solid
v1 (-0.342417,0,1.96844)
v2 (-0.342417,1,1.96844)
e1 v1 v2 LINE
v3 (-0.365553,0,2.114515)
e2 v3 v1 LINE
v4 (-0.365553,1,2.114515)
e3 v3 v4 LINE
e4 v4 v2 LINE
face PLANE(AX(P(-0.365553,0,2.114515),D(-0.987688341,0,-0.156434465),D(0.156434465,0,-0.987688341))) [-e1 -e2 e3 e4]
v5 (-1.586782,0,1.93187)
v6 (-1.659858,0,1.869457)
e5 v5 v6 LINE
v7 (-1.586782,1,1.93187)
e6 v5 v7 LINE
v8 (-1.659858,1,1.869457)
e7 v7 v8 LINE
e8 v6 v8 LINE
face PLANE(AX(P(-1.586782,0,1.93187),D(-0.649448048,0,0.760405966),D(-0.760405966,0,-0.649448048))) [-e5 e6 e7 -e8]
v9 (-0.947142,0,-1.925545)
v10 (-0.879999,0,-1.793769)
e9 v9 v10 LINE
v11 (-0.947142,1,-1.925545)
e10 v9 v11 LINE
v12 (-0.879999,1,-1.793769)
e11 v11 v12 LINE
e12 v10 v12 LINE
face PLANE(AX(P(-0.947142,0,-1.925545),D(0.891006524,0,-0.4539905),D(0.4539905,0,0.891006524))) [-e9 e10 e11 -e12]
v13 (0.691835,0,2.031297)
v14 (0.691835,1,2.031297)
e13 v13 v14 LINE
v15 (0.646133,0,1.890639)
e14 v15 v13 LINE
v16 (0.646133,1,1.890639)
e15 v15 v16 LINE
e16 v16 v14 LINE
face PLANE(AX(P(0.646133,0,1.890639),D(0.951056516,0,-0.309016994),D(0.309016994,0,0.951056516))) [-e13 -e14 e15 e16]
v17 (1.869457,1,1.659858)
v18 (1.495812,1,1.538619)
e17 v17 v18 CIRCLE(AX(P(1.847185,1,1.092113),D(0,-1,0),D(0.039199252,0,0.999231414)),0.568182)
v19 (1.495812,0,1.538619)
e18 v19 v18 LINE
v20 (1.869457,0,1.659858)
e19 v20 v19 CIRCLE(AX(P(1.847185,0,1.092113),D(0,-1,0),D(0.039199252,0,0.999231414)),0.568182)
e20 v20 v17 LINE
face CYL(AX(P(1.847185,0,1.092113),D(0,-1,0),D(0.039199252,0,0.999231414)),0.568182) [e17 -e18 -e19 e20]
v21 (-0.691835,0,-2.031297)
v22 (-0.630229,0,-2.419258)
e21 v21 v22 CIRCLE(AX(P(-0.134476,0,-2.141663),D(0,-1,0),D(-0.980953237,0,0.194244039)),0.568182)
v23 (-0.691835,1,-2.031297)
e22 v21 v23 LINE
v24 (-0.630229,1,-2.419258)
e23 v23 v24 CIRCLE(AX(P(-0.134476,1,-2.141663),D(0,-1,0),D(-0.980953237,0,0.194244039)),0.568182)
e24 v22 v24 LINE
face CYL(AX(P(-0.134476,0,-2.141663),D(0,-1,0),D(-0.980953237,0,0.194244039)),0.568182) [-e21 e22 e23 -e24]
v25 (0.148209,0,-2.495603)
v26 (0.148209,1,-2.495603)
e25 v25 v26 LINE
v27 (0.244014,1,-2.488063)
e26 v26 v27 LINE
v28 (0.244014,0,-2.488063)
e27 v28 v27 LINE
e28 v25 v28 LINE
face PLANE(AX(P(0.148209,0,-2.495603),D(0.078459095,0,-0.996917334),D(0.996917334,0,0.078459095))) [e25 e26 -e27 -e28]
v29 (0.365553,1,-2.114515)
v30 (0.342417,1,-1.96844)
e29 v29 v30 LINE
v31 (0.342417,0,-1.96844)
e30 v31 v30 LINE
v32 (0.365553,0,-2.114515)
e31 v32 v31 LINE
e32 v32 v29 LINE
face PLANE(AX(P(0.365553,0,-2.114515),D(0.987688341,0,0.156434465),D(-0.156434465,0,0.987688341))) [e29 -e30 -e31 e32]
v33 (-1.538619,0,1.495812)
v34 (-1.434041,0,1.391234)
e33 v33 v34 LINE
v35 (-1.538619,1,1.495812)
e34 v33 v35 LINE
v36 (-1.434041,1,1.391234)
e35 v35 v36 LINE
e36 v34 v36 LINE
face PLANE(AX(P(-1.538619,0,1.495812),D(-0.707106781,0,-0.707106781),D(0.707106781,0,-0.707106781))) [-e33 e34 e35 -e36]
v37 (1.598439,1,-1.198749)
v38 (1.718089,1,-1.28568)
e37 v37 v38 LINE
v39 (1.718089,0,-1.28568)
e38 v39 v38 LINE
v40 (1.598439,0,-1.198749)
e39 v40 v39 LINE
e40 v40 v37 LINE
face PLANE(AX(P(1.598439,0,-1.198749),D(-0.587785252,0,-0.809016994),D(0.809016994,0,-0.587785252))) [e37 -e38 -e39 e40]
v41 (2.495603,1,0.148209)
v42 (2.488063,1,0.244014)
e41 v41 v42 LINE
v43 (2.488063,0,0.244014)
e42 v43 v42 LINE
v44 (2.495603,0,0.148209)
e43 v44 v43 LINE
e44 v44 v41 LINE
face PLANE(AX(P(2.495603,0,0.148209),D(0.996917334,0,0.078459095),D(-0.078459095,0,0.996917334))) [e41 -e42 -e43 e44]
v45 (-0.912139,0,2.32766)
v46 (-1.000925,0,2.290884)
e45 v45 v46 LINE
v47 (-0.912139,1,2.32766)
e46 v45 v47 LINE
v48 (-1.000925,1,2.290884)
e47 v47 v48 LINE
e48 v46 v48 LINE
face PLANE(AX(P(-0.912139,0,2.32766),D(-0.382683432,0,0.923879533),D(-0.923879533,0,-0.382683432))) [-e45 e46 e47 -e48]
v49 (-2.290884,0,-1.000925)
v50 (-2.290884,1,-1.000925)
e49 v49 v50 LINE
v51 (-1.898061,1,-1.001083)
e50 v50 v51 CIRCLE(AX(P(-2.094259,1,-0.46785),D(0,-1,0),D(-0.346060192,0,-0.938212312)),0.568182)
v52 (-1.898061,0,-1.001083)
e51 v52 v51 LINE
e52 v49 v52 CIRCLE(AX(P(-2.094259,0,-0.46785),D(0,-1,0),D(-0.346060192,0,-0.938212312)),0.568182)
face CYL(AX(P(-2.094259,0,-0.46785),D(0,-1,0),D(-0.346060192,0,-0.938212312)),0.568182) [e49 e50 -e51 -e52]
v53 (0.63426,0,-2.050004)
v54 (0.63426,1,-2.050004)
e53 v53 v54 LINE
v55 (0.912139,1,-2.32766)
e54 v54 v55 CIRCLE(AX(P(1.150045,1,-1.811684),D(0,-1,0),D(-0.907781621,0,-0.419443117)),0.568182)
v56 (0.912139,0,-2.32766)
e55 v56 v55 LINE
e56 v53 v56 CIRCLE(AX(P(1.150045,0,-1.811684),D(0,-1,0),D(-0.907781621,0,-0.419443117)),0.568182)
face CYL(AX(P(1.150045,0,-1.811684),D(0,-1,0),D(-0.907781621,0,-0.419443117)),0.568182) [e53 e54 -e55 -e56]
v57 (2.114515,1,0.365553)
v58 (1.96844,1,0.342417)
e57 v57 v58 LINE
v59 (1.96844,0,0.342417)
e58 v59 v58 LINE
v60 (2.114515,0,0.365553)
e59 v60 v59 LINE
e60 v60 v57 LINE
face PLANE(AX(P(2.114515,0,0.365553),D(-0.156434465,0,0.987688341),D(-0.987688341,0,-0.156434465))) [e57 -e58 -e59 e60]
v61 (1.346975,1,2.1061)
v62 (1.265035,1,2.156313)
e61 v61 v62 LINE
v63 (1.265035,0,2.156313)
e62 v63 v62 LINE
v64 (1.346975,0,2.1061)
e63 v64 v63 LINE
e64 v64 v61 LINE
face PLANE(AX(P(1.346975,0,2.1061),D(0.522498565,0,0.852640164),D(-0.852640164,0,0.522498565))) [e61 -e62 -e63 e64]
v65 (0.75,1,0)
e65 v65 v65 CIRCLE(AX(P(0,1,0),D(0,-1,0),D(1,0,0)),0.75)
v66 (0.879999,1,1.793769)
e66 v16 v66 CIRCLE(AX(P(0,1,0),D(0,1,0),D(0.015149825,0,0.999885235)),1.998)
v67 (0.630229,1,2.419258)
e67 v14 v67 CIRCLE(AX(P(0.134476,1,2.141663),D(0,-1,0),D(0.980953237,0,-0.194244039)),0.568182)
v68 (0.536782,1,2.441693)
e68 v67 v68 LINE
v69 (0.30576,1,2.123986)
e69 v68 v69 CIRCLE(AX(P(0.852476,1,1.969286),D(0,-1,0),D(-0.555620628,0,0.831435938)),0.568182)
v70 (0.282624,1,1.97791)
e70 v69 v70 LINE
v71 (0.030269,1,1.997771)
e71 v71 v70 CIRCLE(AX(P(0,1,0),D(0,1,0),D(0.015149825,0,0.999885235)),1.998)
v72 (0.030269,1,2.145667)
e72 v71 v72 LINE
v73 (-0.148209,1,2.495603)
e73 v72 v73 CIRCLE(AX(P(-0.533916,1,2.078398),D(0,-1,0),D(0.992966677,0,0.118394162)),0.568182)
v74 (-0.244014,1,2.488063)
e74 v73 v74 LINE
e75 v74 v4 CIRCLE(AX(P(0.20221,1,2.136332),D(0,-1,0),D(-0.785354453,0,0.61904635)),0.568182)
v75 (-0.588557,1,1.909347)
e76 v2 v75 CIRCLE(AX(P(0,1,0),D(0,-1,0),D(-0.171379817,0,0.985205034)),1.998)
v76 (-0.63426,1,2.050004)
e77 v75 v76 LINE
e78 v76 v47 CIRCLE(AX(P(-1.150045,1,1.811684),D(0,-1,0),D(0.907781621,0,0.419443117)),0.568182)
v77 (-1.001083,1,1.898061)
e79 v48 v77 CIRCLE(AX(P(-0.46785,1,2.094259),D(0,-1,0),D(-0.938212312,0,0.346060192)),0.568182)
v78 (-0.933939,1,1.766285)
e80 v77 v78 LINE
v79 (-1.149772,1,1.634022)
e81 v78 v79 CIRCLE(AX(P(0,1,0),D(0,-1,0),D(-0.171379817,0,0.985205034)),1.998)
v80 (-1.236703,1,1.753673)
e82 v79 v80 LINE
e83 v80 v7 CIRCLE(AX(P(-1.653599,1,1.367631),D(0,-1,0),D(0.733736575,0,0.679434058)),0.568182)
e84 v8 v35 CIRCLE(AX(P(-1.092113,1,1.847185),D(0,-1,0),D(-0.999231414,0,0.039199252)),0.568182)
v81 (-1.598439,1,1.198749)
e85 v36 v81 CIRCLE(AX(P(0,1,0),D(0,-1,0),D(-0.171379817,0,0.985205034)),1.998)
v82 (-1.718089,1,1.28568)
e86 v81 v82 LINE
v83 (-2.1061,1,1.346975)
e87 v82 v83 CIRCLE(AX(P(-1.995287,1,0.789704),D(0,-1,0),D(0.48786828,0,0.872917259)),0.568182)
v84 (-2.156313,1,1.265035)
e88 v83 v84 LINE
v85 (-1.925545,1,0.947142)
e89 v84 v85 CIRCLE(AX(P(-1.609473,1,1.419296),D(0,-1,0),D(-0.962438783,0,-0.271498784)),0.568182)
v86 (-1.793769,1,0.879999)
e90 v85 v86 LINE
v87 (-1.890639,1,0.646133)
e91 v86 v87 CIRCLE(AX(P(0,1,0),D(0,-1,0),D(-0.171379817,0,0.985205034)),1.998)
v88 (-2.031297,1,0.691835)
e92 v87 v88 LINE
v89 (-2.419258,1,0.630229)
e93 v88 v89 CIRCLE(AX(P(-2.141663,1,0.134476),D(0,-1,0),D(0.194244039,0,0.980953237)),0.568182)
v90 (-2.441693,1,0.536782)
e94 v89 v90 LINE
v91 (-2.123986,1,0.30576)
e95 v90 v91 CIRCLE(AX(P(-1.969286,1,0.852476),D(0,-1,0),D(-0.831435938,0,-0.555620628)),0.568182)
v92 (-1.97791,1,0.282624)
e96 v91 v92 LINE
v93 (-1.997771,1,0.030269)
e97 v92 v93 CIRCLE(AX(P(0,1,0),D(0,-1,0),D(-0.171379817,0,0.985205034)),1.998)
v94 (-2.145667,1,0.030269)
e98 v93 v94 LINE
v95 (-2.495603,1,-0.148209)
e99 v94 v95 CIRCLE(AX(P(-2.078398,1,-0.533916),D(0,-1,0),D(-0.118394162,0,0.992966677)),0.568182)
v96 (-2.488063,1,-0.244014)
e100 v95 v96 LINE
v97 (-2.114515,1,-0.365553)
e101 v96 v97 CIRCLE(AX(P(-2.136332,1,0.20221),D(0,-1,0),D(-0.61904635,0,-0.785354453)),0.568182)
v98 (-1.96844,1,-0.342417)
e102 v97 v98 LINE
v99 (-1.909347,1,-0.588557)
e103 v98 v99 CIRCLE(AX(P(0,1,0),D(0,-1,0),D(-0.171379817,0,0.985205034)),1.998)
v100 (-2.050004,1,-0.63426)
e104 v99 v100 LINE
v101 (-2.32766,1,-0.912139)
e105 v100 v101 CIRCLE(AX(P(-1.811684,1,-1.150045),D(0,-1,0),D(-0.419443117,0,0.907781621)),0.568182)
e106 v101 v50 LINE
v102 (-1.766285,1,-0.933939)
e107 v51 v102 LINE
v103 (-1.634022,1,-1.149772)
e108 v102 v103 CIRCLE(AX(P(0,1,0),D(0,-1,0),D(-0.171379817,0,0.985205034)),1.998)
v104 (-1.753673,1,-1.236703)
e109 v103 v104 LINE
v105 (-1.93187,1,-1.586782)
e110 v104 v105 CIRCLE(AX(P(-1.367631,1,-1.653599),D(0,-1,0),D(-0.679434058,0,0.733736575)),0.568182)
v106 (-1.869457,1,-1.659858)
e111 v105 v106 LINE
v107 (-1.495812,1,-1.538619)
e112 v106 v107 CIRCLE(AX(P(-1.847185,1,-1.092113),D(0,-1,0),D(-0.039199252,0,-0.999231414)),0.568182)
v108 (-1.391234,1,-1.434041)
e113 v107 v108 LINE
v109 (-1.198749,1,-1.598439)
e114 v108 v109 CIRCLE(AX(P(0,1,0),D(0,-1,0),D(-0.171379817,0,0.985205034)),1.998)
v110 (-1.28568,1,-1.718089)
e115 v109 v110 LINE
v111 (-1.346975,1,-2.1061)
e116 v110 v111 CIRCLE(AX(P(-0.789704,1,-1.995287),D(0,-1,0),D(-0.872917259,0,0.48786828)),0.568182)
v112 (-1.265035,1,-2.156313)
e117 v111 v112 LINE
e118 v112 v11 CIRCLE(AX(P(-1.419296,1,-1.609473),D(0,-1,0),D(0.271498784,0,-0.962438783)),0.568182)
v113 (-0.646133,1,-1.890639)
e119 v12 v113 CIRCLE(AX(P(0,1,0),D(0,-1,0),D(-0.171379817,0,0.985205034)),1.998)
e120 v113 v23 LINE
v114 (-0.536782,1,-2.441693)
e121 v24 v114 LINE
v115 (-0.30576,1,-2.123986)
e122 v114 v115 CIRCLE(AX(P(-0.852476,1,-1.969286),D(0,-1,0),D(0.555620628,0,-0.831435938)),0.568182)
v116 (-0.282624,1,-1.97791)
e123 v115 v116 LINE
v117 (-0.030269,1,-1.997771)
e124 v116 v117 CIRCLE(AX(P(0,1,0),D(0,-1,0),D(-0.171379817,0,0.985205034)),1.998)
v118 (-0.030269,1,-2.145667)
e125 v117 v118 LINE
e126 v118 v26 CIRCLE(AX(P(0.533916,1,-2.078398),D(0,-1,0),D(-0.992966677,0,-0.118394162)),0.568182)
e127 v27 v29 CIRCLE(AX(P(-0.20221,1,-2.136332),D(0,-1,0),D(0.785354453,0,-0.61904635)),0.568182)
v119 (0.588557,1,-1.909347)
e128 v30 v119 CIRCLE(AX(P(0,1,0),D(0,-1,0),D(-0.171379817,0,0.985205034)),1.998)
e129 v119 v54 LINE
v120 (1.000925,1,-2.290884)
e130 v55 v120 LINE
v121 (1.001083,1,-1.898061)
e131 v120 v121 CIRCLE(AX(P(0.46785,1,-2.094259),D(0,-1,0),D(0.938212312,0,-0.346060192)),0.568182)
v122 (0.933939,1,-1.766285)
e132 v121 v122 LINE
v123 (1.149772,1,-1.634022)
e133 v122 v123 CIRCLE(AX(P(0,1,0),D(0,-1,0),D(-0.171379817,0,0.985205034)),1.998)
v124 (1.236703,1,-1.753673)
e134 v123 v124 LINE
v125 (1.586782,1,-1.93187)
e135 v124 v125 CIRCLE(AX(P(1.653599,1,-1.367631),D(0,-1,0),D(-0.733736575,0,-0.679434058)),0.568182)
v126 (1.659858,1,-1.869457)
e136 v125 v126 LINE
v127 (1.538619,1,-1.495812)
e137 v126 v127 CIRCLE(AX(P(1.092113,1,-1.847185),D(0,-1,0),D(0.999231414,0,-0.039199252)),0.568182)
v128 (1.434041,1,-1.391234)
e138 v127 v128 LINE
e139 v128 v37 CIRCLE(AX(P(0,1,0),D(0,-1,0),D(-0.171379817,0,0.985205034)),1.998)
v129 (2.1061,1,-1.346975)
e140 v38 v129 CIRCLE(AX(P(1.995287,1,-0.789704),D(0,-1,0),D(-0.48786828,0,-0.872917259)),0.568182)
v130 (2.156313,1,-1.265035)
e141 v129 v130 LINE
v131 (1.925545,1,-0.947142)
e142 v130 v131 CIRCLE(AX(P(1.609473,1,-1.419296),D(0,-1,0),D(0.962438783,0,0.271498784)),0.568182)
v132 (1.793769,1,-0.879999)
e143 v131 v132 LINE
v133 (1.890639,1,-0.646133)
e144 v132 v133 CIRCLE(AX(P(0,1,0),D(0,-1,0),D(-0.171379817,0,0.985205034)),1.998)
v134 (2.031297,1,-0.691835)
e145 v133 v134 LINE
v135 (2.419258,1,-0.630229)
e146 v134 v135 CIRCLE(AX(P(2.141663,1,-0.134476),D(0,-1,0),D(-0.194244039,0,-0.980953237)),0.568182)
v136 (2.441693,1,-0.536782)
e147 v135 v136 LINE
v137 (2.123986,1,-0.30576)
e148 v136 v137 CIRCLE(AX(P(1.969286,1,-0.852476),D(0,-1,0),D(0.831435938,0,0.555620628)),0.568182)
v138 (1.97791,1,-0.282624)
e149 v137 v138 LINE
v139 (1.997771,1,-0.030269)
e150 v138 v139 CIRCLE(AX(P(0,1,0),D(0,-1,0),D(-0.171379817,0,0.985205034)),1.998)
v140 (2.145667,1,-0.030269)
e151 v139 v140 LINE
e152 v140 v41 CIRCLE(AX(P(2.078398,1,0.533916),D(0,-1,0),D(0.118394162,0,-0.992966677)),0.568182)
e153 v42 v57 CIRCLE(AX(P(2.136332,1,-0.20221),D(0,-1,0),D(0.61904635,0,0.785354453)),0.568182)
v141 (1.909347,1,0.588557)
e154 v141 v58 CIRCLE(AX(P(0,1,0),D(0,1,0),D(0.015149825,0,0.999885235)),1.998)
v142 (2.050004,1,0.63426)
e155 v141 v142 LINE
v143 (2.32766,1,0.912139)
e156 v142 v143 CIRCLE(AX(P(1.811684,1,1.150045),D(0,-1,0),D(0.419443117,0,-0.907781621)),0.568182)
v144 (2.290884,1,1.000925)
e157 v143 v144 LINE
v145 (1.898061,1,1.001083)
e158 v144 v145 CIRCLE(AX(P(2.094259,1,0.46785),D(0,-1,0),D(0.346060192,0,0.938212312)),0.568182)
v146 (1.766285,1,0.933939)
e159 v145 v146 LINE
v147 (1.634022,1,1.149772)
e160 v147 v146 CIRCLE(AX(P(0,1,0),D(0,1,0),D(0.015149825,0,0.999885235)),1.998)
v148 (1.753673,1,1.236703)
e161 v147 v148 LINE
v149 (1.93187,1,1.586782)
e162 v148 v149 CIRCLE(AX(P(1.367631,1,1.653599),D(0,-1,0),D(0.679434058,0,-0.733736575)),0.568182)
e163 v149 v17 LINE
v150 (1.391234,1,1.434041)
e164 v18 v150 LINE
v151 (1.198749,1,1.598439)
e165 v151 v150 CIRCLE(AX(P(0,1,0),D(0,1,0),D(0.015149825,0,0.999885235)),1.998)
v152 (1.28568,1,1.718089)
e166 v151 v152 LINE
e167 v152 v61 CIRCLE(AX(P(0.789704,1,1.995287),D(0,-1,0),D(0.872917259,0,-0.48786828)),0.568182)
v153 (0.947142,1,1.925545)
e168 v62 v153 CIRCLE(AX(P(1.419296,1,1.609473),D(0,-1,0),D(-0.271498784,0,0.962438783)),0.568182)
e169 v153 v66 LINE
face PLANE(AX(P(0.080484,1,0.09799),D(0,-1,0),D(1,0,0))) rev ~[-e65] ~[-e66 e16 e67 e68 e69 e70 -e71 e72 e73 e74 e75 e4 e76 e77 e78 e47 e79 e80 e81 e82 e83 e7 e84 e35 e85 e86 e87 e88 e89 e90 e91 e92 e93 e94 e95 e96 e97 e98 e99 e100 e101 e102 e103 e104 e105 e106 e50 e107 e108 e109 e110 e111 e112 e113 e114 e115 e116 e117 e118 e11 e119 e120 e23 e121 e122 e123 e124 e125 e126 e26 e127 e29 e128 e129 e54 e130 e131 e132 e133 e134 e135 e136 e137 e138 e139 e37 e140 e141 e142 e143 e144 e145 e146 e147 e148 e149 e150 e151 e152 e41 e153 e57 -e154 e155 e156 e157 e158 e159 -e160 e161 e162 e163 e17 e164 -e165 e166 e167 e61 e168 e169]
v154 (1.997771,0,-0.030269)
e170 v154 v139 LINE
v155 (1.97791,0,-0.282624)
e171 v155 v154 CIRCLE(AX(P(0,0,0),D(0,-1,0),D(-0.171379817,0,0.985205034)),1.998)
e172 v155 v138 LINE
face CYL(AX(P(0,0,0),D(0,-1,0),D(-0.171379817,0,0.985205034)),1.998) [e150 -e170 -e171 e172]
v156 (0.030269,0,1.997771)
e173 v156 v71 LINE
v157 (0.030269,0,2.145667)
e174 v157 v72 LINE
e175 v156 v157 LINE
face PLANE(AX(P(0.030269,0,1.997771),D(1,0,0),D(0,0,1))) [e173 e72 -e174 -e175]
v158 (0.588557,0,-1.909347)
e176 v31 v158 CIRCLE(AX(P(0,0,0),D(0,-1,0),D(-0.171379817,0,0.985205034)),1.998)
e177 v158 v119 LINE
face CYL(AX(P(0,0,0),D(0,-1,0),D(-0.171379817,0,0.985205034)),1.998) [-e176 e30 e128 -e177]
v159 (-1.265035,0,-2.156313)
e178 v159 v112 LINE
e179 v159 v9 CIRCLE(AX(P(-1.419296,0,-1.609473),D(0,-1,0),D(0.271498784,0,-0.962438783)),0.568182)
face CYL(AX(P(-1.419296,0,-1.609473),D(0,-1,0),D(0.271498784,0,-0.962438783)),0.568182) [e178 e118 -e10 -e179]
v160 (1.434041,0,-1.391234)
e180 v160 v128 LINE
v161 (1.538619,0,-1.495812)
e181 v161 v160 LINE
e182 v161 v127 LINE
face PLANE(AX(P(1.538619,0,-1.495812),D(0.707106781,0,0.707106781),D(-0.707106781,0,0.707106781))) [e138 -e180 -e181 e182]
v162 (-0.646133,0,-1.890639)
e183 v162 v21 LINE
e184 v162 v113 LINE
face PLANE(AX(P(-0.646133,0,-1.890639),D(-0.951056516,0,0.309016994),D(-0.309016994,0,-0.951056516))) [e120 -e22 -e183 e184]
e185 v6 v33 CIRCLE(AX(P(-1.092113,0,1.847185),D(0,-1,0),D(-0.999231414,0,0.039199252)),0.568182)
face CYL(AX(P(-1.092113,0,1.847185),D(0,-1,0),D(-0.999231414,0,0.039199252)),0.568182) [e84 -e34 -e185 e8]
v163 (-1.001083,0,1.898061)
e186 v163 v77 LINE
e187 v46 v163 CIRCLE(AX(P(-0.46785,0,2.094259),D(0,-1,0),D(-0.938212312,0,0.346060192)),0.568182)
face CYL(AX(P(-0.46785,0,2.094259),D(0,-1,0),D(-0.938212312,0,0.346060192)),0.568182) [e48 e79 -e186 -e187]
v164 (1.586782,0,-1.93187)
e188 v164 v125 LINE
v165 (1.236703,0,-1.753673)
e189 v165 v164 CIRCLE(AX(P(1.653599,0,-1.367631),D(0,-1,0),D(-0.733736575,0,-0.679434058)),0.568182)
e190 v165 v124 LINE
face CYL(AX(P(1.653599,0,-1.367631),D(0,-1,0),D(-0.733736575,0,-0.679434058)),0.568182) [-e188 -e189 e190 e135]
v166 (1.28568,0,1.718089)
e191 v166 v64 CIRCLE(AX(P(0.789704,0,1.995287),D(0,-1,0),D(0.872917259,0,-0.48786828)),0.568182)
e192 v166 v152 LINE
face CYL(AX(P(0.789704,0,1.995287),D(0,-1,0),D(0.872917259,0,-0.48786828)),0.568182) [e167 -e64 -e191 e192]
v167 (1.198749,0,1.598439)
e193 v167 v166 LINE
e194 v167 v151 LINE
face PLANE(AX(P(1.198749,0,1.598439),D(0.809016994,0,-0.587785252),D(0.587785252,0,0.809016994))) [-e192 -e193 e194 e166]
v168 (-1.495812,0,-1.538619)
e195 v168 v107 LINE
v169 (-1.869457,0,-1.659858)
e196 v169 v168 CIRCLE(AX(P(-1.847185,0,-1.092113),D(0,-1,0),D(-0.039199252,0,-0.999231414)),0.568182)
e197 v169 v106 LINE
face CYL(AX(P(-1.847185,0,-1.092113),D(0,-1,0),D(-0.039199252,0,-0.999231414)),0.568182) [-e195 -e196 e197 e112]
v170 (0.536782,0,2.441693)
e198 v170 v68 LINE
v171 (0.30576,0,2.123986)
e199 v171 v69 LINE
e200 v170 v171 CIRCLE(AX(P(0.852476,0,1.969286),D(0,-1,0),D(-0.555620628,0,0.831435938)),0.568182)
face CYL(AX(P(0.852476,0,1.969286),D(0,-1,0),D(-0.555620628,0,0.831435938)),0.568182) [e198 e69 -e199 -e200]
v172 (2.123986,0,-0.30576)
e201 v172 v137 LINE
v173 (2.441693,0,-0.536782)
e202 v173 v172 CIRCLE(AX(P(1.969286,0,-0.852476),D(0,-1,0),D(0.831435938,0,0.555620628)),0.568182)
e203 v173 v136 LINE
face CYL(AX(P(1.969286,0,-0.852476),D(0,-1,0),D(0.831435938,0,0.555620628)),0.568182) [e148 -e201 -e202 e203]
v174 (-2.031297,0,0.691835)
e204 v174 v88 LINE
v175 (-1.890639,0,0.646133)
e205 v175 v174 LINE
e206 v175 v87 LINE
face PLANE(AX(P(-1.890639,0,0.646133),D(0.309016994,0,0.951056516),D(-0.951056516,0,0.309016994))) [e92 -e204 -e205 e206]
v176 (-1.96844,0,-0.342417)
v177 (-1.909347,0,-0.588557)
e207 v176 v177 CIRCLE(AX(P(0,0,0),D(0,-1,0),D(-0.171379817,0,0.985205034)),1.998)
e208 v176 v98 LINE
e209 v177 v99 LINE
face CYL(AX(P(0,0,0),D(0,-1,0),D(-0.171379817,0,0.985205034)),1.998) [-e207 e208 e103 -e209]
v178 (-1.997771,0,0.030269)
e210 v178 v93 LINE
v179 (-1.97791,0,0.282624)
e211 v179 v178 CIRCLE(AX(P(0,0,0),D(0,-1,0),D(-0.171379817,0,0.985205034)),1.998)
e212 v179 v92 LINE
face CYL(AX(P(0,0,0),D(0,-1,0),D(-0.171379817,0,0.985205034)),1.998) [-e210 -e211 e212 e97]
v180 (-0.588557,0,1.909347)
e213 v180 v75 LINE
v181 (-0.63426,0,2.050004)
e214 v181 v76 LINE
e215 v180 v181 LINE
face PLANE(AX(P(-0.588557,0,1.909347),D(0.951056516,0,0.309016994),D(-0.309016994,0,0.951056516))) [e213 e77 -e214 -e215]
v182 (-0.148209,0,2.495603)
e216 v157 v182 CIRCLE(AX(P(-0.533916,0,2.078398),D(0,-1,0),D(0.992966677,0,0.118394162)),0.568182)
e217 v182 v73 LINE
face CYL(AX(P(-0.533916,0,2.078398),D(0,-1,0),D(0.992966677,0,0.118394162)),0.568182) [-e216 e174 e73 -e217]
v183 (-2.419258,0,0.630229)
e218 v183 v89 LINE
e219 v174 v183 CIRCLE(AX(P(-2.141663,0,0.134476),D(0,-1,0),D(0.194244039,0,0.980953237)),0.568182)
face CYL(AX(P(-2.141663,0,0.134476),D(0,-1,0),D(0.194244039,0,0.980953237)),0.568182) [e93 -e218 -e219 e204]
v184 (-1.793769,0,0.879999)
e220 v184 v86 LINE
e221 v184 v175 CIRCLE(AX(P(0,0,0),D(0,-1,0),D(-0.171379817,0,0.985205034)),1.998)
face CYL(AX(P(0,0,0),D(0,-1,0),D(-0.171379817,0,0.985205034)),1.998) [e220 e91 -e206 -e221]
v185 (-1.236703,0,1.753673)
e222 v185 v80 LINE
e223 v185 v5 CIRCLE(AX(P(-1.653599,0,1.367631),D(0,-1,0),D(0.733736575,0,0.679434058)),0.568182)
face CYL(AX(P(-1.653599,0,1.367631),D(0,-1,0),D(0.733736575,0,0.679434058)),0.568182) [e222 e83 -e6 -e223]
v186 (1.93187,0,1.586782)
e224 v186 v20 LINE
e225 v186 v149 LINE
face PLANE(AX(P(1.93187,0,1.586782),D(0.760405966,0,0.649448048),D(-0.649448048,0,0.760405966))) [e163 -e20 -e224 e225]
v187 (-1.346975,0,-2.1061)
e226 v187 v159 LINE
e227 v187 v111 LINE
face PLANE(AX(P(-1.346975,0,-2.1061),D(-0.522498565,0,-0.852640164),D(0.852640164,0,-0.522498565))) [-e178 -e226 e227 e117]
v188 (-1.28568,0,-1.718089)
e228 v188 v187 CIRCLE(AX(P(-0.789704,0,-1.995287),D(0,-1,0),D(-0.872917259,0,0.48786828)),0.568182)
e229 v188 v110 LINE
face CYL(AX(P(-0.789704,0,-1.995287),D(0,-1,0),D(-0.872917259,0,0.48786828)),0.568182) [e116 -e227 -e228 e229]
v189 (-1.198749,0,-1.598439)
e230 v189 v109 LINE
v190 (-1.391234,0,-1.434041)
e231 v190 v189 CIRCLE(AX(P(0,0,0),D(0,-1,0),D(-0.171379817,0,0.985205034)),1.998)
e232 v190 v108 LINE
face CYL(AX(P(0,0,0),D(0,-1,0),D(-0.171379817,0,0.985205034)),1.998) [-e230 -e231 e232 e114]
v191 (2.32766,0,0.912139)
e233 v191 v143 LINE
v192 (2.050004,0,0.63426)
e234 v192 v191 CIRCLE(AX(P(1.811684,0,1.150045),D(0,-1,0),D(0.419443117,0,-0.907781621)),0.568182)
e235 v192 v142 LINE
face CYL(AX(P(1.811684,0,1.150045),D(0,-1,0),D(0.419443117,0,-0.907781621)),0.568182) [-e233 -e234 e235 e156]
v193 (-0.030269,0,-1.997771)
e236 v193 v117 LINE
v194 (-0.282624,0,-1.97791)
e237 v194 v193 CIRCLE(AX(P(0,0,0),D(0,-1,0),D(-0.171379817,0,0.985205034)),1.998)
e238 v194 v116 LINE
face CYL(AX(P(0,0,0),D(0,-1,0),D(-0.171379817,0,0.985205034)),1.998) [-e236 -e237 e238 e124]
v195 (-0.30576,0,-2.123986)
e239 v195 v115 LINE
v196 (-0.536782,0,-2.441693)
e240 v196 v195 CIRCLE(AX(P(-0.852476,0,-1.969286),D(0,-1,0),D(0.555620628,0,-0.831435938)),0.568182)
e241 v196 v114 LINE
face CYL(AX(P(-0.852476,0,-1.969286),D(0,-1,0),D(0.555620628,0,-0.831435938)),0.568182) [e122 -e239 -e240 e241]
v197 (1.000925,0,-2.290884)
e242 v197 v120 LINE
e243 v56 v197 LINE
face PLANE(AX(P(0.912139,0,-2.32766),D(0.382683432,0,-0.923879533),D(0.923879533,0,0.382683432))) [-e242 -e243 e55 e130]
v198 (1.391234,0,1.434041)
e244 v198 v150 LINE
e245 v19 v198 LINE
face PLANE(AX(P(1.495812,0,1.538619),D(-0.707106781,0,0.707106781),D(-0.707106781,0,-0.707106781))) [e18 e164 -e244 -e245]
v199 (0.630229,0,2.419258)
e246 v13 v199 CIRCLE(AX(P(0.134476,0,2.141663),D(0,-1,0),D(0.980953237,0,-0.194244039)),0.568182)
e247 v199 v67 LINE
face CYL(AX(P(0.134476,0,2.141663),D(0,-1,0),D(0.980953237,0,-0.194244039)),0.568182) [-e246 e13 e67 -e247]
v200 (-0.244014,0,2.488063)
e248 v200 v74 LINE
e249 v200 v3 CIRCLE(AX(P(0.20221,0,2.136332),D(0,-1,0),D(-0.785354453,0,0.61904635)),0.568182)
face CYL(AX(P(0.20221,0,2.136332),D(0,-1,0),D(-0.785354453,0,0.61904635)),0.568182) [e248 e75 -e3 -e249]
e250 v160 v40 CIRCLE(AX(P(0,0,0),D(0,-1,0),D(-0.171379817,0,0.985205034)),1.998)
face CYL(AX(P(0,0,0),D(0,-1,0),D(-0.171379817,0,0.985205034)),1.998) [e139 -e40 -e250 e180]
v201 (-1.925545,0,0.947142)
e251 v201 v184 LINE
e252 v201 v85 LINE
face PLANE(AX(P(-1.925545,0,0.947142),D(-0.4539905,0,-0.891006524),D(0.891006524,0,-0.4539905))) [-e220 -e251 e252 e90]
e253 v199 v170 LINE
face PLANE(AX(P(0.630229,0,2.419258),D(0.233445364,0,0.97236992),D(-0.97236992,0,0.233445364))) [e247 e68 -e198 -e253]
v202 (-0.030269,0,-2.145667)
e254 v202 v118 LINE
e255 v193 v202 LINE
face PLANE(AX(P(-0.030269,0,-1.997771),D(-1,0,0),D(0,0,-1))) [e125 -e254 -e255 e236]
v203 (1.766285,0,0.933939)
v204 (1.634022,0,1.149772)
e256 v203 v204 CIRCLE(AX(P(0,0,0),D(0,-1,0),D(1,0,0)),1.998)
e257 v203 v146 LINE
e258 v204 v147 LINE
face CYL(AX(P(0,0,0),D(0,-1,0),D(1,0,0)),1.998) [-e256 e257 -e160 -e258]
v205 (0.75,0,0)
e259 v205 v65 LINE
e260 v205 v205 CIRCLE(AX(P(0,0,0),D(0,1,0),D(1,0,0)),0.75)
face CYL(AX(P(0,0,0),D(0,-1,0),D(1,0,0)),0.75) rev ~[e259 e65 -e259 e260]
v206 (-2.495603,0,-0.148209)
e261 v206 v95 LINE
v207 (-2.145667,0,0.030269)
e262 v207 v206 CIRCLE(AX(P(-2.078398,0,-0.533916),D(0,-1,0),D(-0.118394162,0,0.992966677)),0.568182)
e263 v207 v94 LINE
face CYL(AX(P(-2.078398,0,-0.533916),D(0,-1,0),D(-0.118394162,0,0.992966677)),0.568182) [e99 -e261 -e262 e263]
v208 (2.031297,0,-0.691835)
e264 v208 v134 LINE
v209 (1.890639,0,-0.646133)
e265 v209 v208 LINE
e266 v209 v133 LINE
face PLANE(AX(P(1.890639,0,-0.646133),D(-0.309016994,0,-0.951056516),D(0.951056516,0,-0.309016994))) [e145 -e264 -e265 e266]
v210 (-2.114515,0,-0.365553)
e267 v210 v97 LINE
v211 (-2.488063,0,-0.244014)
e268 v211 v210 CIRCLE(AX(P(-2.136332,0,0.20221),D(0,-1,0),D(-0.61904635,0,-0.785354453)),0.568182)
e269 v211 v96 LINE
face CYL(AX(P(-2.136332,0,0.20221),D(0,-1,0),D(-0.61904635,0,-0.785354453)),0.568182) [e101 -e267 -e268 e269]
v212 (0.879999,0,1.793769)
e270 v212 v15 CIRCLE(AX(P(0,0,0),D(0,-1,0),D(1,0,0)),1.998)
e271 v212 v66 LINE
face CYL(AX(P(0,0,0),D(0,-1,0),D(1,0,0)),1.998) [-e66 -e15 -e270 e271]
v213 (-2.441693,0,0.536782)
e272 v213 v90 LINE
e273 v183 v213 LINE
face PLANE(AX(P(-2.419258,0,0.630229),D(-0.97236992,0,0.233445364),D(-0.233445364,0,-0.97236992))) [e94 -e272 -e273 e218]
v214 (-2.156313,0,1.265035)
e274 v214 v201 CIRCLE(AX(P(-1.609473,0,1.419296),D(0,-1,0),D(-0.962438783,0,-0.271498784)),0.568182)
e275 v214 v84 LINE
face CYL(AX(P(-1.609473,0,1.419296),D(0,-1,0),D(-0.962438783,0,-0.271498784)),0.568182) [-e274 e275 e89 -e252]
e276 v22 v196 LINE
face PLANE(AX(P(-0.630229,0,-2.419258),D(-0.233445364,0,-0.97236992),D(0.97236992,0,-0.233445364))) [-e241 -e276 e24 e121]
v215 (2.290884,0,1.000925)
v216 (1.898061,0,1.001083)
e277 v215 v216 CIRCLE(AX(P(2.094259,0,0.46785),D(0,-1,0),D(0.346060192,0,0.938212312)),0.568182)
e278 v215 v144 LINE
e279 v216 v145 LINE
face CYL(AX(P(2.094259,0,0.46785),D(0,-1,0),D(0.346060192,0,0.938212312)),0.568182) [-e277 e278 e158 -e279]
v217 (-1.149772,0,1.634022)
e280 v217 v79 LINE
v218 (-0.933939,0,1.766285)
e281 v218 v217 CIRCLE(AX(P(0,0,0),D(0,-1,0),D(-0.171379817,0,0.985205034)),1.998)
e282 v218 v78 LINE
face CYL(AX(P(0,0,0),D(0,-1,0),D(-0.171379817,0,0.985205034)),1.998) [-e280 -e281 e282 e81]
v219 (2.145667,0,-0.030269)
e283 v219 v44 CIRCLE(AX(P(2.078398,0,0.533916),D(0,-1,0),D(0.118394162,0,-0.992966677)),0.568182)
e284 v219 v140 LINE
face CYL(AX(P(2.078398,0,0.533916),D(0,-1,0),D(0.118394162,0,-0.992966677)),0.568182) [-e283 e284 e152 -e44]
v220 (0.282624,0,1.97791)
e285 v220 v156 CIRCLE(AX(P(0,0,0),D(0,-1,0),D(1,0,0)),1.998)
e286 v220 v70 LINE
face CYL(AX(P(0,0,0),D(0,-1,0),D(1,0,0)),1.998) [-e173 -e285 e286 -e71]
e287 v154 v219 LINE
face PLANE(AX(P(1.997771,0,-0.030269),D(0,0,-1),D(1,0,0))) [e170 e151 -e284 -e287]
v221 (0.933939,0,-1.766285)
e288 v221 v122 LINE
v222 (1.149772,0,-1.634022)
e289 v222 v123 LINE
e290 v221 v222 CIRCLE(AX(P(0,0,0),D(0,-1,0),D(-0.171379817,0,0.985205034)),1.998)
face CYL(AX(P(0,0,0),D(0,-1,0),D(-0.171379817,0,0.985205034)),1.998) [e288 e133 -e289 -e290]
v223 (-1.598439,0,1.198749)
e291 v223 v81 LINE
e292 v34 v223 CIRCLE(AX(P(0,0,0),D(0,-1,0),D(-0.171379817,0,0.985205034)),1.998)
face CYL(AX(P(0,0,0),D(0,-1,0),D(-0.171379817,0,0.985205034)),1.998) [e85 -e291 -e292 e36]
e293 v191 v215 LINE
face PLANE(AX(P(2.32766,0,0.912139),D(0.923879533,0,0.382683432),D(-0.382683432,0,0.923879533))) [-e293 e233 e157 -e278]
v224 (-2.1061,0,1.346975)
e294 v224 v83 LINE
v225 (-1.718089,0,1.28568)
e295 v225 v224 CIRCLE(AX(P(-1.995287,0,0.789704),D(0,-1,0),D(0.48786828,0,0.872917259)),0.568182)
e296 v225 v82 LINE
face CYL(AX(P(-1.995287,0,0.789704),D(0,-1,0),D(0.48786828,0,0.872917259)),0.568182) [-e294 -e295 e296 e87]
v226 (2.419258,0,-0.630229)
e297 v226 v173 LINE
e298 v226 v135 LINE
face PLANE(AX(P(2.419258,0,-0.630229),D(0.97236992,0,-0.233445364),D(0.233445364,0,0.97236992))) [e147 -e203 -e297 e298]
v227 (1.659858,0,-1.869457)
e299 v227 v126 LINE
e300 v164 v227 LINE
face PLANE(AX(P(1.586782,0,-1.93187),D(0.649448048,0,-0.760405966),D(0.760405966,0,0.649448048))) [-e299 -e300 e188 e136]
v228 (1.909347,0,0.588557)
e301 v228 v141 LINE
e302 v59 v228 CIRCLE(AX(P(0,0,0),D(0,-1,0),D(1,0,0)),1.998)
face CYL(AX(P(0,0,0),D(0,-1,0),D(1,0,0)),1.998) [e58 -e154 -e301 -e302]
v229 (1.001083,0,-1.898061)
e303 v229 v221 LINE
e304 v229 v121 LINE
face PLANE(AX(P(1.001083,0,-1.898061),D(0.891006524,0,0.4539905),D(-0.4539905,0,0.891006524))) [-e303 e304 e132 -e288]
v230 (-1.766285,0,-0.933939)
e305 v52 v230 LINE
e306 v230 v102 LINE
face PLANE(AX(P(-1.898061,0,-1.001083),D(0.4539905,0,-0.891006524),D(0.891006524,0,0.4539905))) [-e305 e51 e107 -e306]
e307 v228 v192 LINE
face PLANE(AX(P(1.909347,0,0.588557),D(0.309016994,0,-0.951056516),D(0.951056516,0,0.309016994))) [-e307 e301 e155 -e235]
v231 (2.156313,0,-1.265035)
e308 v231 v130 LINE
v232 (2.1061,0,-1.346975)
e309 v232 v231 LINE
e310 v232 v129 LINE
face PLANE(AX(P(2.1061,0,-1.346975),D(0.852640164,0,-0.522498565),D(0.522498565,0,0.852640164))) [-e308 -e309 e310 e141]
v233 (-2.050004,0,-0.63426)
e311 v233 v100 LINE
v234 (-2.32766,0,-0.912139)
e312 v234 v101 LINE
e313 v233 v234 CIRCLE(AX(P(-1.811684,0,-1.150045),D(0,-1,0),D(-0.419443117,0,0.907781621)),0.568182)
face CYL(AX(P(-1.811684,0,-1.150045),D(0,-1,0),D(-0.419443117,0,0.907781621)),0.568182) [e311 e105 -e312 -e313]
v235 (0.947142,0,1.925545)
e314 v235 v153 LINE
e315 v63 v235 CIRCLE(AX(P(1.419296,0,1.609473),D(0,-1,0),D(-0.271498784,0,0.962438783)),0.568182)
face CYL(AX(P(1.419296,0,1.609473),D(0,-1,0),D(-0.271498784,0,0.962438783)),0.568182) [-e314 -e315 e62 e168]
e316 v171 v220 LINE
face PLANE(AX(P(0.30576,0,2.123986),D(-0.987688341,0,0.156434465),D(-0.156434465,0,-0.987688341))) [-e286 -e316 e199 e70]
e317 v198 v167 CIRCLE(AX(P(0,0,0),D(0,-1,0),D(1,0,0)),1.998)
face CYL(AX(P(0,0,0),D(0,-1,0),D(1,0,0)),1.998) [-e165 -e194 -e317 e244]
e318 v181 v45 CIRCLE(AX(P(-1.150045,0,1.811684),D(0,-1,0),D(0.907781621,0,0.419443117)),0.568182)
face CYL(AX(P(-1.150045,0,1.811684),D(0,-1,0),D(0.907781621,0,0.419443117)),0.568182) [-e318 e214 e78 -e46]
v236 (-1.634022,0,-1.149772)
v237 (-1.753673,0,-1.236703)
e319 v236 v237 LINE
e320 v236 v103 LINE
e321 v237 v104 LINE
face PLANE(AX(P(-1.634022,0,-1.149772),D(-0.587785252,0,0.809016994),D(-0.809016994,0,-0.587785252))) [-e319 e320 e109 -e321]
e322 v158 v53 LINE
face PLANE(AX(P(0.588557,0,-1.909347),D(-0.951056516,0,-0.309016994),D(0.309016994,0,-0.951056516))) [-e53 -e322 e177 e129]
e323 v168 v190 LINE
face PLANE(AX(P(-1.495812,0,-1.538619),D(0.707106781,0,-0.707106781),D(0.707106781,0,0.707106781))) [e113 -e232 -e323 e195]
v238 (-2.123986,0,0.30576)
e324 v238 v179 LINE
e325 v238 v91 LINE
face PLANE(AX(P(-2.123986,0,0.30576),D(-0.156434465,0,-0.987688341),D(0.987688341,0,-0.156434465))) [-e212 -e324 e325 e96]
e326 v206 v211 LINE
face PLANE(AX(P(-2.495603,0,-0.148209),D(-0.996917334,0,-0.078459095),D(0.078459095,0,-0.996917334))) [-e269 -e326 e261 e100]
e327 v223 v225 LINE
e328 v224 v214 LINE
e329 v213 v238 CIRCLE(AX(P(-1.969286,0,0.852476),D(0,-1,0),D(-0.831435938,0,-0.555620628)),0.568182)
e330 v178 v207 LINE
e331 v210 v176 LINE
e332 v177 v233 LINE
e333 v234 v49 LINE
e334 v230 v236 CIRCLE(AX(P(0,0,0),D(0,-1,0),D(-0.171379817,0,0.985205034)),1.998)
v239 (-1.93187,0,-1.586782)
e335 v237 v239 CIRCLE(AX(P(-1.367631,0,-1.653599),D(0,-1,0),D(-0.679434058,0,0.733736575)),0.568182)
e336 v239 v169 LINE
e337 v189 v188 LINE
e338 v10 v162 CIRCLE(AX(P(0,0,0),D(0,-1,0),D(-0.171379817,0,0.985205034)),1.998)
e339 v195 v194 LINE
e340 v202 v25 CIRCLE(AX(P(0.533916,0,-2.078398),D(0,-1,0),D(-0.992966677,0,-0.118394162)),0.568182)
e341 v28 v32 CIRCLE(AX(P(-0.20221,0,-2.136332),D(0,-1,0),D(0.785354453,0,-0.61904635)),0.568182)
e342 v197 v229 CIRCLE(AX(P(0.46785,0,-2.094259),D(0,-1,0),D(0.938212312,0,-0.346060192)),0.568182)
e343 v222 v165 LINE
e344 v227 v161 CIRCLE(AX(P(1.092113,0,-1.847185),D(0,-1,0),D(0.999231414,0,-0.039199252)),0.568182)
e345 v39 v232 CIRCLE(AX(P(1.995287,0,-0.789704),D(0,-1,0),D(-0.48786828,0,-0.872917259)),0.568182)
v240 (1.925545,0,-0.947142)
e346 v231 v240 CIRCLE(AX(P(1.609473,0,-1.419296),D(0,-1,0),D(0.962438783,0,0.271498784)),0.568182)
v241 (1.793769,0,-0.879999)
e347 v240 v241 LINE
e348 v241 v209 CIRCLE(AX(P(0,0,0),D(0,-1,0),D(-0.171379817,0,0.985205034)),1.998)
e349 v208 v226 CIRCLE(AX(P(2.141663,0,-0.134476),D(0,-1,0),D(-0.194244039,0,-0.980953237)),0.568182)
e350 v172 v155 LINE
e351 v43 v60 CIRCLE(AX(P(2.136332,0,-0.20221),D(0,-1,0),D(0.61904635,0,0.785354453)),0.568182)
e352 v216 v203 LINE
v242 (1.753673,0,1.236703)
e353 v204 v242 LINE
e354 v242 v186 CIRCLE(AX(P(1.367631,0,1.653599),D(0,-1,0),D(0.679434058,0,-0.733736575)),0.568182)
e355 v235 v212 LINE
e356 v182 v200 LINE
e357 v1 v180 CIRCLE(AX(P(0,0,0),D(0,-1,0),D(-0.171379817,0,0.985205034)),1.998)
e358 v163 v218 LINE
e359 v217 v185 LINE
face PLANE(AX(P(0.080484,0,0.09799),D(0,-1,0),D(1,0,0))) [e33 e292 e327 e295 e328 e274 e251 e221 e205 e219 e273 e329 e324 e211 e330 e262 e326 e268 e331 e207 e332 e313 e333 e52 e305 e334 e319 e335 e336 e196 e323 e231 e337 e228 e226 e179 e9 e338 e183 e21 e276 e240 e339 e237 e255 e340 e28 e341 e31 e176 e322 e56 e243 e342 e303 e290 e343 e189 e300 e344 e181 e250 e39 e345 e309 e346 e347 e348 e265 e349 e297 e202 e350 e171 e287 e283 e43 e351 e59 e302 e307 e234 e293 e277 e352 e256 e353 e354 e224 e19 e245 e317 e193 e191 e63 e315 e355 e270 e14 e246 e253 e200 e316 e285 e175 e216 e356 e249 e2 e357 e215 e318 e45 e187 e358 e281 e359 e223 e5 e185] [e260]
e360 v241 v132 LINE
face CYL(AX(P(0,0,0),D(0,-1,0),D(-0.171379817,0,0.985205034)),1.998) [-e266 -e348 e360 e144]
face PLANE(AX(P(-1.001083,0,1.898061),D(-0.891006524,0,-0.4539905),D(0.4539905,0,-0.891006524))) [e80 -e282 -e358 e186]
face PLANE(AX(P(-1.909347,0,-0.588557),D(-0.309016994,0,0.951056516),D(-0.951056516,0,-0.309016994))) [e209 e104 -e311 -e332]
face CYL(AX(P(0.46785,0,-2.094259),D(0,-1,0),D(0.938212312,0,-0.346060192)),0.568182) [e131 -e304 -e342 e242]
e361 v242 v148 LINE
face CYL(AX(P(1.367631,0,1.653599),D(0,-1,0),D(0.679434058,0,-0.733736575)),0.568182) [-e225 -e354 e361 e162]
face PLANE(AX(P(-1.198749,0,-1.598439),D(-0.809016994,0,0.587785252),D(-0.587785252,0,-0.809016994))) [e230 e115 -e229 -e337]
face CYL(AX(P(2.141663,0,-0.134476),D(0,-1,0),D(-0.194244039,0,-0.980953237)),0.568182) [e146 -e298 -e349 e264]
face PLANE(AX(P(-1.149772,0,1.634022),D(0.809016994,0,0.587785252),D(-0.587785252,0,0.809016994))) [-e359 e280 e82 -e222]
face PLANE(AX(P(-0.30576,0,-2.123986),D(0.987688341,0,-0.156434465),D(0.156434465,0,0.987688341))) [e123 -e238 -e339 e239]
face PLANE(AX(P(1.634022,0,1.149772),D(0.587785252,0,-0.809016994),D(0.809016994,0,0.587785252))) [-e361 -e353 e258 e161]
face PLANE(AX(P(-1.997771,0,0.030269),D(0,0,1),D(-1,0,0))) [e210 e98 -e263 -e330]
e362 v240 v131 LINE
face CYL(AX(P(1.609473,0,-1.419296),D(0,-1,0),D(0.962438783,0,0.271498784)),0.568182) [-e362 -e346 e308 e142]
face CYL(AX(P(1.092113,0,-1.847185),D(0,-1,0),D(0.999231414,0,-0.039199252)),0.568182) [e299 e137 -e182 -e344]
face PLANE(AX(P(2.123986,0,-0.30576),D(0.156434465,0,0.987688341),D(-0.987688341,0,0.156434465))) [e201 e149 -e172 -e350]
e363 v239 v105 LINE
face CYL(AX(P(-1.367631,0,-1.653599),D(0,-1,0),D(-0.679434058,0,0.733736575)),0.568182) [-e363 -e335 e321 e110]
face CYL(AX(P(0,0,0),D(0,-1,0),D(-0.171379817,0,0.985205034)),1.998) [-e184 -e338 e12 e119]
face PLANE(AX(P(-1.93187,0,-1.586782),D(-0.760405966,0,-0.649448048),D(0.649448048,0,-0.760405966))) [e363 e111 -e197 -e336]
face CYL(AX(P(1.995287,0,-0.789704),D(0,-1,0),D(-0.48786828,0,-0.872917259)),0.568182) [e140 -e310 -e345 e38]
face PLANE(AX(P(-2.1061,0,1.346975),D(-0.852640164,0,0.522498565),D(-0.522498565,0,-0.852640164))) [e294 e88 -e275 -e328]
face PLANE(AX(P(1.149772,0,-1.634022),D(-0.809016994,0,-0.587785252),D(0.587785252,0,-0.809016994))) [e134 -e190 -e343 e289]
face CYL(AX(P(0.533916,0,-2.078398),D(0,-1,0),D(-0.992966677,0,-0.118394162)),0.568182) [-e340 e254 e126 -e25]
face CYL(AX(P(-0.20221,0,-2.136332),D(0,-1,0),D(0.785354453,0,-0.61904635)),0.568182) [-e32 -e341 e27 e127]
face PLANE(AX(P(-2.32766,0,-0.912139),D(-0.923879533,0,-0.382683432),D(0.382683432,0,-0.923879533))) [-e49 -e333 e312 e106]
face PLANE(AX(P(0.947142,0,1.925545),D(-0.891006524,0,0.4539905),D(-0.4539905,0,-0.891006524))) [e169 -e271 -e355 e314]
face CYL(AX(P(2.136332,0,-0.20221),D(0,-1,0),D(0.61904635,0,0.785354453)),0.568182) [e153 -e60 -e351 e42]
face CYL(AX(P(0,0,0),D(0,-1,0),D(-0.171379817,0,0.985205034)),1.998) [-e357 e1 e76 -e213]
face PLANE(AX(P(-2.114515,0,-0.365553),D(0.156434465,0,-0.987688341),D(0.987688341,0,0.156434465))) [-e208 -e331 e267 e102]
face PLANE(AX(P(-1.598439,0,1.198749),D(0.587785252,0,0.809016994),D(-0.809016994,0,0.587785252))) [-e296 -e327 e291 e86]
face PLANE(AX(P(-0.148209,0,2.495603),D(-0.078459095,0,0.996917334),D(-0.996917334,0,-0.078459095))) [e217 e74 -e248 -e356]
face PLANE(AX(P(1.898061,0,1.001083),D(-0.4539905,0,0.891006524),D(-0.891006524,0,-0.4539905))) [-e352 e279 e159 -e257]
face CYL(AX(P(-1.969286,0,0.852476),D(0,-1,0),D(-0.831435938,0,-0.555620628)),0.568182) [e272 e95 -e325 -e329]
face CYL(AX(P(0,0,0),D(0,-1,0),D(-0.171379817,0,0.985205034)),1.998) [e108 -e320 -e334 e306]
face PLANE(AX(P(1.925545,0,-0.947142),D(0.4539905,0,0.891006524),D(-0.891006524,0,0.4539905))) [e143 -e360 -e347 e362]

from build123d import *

# Parameters (mm, degrees)
F1_R     = 0.75
F2_DEPTH = 1
F3_COUNT = 20
F3_ANGLE = 342


# Not quite as in the source:
# - a feature names something its author has since deleted; it is built from what else it names


with BuildPart() as f2:
    # F1 (on Front) → F2 (new body)
    with BuildSketch(Plane.XZ):
        with BuildLine():
            ThreePointArc((-0.342416875, 1.9684396571), (-1.2860511428, -1.5290769955), (1.998, 0))
            ThreePointArc((1.998, 0), (1.4234609517, 1.4020566747), (0.0302693503, 1.9977706992))
            ThreePointArc((0.0302693503, 1.9977706992), (-0.1567612733, 1.9918408328), (-0.342416875, 1.9684396571))
        make_face()
        Circle(F1_R, mode=Mode.SUBTRACT)
        with BuildLine():
            ThreePointArc((-0.342416875, 1.9684396571), (-0.1567612733, 1.9918408328), (0.0302693503, 1.9977706992))
            Line((0.0302693503, 1.9977706992), (0.0302693503, 2.145667056))
            ThreePointArc((0.0302693503, 2.145667056), (-0.0277660563, 2.3365498257), (-0.1482087326, 2.4956029675))
            Line((-0.1482087326, 2.4956029675), (-0.244014278, 2.4880629076))
            ThreePointArc((-0.244014278, 2.4880629076), (-0.3380927119, 2.3121265883), (-0.3655529625, 2.1145151644))
            Line((-0.3655529625, 2.1145151644), (-0.342416875, 1.9684396571))
        make_face()
    extrude(amount=-F2_DEPTH)

    # F3: F2 ×20 about axis
    f3_axis = Axis((0, 0, 0), (0, -1, 0))


with BuildPart() as f2_1:
    add(f2.part)
    for i in range(1, F3_COUNT):
        add(f2.part.rotate(f3_axis, i * F3_ANGLE / (F3_COUNT - 1)))


solid = f2_1.part
